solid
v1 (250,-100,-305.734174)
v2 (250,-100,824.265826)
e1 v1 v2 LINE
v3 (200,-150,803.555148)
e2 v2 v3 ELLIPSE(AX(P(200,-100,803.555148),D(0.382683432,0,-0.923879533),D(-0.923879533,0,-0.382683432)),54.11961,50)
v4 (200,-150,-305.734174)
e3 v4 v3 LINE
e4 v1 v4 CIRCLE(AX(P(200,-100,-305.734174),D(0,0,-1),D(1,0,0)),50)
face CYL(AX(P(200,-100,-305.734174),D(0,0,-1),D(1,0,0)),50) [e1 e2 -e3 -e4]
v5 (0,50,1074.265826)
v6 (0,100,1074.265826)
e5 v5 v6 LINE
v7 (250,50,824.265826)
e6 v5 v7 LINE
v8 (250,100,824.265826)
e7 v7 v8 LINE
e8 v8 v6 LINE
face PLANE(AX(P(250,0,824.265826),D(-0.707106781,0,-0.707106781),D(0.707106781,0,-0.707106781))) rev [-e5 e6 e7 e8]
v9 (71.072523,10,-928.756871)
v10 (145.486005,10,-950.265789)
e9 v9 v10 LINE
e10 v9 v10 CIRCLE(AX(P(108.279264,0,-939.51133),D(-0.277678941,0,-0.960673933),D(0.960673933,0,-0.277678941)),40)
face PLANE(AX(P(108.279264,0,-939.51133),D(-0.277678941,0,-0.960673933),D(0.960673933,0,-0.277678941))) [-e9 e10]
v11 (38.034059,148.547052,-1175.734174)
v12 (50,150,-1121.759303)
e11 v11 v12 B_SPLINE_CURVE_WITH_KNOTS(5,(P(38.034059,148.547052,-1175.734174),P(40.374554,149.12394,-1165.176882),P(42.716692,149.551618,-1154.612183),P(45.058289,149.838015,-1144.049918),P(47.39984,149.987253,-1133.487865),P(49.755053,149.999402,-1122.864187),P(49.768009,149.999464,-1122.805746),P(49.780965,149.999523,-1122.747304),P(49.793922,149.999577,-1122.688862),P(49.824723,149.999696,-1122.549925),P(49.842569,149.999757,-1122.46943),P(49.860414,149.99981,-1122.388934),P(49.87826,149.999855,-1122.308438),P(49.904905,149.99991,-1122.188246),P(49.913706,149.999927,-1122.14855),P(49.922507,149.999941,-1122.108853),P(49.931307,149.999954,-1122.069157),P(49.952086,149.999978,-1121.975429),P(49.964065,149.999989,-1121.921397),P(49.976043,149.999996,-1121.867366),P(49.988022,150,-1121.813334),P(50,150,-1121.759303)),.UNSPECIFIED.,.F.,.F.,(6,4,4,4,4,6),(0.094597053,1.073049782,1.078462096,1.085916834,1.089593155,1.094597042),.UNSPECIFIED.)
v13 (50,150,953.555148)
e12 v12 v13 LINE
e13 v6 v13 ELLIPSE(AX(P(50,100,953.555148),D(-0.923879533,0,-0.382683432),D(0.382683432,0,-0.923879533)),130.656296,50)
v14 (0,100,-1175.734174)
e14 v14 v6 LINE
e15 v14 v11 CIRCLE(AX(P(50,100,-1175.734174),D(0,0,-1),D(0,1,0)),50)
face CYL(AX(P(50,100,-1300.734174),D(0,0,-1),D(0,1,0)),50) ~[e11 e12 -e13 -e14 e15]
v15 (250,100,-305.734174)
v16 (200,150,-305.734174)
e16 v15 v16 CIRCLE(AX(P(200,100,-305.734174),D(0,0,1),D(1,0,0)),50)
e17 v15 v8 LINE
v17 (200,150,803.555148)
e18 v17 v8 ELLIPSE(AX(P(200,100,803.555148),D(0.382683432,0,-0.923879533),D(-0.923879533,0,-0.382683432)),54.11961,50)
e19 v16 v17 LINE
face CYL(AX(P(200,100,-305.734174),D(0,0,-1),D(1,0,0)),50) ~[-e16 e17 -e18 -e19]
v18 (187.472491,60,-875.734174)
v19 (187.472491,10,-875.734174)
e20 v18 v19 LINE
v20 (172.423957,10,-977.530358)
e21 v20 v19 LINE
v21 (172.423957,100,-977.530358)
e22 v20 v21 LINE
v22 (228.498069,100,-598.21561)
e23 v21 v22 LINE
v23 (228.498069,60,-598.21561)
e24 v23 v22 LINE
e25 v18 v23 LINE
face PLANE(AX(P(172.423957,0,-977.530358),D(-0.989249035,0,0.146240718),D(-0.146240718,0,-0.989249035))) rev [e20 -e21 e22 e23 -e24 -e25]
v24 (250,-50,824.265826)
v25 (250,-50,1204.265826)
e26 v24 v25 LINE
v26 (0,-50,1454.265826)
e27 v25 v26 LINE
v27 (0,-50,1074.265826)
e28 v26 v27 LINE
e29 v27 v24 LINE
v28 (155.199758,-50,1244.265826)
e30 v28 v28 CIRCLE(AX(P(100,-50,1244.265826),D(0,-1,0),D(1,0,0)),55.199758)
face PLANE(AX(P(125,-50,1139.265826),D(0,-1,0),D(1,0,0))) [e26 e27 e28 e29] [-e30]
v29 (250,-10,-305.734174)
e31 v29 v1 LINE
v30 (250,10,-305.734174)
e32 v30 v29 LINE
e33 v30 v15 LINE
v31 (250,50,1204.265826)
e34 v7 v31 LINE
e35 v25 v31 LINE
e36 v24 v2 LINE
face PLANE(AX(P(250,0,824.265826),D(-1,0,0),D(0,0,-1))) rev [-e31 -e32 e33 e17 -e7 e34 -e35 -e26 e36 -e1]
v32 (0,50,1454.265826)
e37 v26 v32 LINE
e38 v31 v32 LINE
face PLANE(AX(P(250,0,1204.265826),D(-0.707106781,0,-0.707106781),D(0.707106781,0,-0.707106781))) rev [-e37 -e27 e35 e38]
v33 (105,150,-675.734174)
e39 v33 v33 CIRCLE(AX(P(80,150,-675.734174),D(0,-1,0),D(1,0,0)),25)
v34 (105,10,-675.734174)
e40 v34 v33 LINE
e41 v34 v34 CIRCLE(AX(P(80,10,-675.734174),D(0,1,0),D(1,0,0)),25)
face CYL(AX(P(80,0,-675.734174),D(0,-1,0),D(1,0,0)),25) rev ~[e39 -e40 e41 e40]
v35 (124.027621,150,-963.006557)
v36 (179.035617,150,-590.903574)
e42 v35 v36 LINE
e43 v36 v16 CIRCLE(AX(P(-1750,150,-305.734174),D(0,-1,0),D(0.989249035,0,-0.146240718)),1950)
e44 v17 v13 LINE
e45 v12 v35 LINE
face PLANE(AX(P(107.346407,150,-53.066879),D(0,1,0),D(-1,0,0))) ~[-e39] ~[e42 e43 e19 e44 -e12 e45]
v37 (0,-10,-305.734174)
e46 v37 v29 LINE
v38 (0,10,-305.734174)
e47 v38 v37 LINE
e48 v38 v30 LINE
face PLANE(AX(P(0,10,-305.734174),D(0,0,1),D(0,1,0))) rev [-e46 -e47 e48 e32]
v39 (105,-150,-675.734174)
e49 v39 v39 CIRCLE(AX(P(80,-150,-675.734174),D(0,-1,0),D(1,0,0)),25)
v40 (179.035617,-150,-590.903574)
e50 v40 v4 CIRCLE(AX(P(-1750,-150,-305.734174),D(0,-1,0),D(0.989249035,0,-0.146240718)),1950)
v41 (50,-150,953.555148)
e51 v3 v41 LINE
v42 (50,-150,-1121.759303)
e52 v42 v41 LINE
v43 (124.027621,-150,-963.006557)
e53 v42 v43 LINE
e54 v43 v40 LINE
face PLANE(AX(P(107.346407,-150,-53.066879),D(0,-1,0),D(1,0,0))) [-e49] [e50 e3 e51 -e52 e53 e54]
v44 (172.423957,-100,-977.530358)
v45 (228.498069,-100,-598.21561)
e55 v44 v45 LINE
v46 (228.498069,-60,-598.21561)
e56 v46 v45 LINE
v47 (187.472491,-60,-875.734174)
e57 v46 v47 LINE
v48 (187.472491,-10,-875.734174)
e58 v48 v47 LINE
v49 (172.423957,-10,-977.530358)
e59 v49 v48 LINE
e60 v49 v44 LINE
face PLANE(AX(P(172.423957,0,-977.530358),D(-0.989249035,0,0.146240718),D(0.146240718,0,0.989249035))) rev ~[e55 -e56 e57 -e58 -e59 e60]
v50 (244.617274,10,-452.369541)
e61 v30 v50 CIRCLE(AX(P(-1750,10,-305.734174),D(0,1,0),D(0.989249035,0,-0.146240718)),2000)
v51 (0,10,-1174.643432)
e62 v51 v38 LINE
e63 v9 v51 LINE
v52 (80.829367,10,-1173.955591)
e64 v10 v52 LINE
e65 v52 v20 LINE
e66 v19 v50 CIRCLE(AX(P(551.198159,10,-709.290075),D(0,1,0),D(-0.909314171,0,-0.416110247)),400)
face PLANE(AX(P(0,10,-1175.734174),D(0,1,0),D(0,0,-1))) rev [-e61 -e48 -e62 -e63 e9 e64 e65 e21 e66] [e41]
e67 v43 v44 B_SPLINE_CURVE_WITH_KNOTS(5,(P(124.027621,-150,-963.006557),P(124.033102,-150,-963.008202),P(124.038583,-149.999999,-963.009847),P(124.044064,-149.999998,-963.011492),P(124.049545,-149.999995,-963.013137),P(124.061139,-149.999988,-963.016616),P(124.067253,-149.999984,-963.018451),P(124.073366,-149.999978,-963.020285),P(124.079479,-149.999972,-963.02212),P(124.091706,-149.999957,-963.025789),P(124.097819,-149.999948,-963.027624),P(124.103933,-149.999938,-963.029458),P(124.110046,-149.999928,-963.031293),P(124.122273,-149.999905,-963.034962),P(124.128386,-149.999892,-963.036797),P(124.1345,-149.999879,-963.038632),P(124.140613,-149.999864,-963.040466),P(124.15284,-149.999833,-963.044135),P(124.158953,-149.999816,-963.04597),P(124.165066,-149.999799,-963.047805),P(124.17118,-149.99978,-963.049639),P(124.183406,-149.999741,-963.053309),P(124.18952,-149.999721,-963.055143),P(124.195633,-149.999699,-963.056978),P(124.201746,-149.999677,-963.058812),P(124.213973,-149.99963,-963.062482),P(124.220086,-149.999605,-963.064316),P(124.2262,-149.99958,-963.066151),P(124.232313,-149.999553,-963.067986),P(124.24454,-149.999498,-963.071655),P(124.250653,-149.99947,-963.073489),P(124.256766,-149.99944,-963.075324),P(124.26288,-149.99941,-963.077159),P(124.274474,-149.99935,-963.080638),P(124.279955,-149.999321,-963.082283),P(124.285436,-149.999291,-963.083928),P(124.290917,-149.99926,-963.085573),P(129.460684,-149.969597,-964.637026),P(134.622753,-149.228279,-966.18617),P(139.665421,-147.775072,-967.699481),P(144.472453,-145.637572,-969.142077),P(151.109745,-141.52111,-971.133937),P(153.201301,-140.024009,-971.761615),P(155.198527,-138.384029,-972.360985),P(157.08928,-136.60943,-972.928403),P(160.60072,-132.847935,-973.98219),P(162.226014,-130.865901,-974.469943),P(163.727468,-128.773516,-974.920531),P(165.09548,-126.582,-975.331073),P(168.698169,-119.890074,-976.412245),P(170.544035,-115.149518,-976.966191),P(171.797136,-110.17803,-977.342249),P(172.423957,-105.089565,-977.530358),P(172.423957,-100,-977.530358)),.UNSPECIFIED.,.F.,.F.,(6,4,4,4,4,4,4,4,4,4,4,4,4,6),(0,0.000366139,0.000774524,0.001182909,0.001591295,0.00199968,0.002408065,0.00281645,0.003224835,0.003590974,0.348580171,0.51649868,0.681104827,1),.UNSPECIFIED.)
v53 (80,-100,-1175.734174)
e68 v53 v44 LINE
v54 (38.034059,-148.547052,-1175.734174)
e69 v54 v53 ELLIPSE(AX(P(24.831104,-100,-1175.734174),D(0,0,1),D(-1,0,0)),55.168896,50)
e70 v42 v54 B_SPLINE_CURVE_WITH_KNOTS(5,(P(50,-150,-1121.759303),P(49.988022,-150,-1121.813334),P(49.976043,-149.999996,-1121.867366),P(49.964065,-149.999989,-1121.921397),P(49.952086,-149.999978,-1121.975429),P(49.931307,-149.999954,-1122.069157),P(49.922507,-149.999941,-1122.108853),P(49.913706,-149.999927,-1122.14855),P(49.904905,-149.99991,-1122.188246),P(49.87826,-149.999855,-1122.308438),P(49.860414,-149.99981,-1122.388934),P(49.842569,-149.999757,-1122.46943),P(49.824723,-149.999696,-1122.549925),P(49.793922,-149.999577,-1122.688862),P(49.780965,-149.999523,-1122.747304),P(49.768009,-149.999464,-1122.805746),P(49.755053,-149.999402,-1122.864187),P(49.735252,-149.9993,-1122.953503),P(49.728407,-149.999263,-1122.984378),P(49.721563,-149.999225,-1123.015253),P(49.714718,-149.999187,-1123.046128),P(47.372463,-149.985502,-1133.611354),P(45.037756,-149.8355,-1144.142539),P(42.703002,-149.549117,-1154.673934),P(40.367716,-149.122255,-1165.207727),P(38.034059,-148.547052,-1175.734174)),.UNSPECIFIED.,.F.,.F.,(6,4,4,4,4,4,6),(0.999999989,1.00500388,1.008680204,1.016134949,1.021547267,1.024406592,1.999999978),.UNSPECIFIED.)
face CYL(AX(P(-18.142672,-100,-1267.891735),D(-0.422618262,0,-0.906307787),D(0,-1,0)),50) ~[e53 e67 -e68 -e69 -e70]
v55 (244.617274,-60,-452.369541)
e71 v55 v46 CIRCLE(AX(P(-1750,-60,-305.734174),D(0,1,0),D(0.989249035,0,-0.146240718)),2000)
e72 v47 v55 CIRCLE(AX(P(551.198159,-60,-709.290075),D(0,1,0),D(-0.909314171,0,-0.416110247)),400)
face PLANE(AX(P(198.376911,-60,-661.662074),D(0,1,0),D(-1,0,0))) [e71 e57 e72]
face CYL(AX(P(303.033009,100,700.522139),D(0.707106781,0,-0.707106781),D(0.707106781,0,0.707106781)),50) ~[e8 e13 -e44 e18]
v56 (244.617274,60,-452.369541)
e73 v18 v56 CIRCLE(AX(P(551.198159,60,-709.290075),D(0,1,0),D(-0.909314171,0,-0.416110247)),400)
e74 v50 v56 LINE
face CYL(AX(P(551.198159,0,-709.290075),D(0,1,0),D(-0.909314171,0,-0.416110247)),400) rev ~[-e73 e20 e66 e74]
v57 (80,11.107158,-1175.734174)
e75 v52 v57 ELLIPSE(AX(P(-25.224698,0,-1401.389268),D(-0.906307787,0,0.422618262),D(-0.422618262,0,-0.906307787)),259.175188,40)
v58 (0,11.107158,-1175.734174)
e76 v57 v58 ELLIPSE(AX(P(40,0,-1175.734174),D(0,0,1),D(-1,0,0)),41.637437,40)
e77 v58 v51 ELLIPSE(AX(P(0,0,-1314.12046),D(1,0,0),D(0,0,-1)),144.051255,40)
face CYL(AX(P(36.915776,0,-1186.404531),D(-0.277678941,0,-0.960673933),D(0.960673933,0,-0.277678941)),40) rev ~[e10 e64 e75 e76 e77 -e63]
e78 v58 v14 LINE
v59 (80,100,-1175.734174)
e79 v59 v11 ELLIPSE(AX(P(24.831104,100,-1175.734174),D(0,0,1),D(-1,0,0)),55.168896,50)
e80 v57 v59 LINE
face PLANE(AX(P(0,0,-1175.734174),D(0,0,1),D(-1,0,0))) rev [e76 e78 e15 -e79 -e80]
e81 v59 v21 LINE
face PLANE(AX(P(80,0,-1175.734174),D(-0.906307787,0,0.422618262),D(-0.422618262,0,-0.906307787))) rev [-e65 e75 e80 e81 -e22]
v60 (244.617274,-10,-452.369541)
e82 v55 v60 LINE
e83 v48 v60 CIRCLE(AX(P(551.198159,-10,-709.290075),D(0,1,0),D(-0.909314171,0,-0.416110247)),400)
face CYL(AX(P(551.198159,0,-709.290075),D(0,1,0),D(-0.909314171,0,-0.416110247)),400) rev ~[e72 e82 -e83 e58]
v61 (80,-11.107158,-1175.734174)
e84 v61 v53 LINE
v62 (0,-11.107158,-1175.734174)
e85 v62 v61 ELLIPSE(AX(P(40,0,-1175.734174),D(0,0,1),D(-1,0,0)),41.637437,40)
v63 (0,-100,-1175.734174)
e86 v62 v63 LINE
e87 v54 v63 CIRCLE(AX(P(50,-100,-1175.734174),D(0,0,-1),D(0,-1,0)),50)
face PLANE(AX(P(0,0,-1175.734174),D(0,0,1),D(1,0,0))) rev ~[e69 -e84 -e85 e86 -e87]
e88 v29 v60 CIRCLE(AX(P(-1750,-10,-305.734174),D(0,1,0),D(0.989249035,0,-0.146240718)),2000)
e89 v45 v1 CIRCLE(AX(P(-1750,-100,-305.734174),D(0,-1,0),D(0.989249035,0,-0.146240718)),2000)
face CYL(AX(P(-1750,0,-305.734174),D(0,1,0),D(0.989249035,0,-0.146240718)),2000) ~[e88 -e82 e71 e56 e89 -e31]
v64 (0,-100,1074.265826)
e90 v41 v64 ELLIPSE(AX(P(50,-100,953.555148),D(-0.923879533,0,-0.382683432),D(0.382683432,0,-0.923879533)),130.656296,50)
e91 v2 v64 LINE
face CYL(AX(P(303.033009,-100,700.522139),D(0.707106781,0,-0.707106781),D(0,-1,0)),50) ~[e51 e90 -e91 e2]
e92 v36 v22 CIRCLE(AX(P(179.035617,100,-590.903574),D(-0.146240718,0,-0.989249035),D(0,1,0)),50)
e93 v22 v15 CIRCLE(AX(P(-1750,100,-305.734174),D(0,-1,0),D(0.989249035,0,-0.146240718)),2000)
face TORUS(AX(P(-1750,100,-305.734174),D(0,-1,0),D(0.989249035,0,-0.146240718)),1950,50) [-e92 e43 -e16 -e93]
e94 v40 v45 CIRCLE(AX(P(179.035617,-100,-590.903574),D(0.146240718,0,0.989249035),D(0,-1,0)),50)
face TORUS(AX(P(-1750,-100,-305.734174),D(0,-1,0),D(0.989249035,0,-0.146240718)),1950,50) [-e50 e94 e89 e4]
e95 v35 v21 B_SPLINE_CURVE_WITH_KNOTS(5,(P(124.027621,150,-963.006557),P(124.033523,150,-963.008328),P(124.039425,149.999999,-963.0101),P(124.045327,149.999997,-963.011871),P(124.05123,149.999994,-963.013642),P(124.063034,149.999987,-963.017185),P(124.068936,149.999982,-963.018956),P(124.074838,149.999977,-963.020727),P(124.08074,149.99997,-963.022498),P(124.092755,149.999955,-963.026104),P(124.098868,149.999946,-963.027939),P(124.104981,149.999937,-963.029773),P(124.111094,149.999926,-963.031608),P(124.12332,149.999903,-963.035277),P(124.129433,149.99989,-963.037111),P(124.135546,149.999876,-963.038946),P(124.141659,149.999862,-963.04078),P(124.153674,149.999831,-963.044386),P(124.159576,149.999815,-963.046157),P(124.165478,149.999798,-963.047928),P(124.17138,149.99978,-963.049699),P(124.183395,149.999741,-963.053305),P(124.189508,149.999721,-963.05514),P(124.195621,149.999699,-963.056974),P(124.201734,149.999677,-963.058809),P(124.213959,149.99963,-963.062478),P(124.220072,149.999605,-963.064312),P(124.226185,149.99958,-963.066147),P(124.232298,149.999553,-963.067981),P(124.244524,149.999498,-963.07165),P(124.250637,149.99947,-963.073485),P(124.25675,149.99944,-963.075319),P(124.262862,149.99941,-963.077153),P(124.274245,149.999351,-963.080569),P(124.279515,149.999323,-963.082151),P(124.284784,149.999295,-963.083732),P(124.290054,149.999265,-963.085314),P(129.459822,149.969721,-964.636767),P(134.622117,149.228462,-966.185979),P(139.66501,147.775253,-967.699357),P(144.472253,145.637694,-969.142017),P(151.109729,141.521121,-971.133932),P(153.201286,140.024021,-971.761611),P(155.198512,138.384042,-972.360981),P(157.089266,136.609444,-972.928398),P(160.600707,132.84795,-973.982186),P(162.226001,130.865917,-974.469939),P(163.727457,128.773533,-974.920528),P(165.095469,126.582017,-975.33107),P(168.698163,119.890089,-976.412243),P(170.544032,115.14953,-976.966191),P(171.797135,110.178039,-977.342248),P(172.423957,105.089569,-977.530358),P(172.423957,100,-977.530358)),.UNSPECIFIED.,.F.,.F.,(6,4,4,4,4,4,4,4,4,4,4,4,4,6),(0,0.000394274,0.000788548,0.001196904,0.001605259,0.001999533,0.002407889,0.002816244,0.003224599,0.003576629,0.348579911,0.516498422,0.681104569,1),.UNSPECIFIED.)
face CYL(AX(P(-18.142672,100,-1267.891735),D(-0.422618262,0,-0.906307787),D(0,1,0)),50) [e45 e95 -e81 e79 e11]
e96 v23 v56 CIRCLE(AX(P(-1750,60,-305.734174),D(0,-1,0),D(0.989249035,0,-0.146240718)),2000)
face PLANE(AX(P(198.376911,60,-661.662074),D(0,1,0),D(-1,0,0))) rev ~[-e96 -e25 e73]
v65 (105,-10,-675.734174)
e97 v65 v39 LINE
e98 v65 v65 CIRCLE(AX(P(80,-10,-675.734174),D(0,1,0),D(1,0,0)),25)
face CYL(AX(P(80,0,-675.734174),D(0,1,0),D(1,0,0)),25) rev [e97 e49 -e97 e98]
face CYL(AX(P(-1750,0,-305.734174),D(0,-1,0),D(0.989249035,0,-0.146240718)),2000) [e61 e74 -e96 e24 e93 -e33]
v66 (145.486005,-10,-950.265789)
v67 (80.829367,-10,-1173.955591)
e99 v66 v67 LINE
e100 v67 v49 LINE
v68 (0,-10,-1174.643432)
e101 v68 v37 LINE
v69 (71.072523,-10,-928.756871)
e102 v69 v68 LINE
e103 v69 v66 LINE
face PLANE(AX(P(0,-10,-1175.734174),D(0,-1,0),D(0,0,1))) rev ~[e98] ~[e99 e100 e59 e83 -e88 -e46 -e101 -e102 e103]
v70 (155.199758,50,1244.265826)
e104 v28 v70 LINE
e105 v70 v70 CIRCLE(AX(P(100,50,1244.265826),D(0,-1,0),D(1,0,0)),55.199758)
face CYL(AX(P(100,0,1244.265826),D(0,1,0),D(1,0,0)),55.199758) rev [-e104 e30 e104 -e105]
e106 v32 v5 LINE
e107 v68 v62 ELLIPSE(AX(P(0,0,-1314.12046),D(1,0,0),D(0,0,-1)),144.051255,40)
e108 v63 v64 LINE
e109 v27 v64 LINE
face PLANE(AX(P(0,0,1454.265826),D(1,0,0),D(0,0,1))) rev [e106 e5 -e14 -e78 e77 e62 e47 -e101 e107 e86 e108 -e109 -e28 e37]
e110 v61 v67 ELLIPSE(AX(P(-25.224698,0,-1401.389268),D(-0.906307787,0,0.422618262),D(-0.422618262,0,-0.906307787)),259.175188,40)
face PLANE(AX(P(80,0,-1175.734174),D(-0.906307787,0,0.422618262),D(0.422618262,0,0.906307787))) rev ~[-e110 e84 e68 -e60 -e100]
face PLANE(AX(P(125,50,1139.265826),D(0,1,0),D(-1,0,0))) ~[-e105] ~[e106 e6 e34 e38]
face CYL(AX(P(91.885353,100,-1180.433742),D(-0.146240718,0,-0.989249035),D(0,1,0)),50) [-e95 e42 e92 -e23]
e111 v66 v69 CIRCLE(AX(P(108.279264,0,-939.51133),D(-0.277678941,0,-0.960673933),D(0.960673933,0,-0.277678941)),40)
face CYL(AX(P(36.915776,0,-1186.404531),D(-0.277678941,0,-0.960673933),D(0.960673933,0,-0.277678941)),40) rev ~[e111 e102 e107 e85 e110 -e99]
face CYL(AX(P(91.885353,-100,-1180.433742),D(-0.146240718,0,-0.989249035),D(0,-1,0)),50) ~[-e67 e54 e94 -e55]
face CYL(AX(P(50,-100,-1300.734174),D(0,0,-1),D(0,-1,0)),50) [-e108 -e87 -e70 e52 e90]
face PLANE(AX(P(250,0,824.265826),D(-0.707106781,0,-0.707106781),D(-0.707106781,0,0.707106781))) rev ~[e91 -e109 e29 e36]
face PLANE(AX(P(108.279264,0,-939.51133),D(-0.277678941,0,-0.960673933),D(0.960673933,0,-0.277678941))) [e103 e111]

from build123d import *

# Parameters (mm, degrees)
F0_R          = 25
F1_DEPTH      = 150
F0_R_2        = 55.1997583715
F2_DEPTH      = 50
F4_DEPTH      = 250.001
F8_DEPTH      = 60
F10_R         = 40
F11_DEPTH     = 257
F12_T1_DEPTH  = 1255
F12_T3_DEPTH  = 2500
F12_T5_DEPTH  = 603.5533905933
F12_T7_DEPTH  = 556.1937137964
F12_T9_DEPTH  = 595.9370668734
F12_T14_DEPTH = 330
F12_S15_R     = 50
F12_T16_DEPTH = 170
F12_T20_DEPTH = 330
F12_S21_R     = 50
F12_T22_DEPTH = 170
F12_T26_DEPTH = 330
F12_S27_R     = 50
F12_T28_DEPTH = 170
F12_T32_DEPTH = 330
F12_S33_R     = 50
F12_T34_DEPTH = 170
F12_T36_ANGLE = 8.4091330213
F12_T38_ANGLE = 8.4091330213


# Not quite as in the source:
# - a fillet or chamfer that OpenCascade refuses, or shapes differently, is made with other operations: its cross-section is extruded or revolved along the edge and cut away or added


with BuildPart() as f1:
    # F0 (on Front) → F1 (new body)
    with BuildSketch(Plane.XZ):
        with BuildLine():
            Line((250, 824.2658257814), (0, 1074.2658257814))
            Line((0, 1074.2658257814), (0, -1175.7341742186))
            Line((0, -1175.7341742186), (80, -1175.7341742186))
            Line((80, -1175.7341742186), (172.4239571783, -977.530358429))
            Line((172.4239571783, -977.530358429), (228.4980691431, -598.2156102055))
            ThreePointArc((228.4980691431, -598.2156102055), (244.6172738506, -452.3695412242), (250, -305.7341742186))
            Line((250, -305.7341742186), (250, 824.2658257814))
        make_face()
        with Locations((80, -675.7341742186)):
            Circle(F0_R, mode=Mode.SUBTRACT)
    extrude(amount=F1_DEPTH)

    # F0 (on Front) → F2 (join)
    with BuildSketch(Plane.XZ):
        Polygon((0, 1454.2658257814), (0, 1074.2658257814), (250, 824.2658257814), (250, 1204.2658257814), align=None)
        with Locations((100, 1244.2658257814)):
            Circle(F0_R_2, mode=Mode.SUBTRACT)
    extrude(amount=F2_DEPTH)

    # F3 (on face) → F4 (cut, through all)
    with BuildSketch(Plane(origin=(0, 0, 0), x_dir=(0, -1, 0), z_dir=(-1, 0, 0))):
        Polygon((10, -1175.7341742186), (10, -305.7341742186), (0, -305.7341742186), (0, -598.2156102055), (0, -977.530358429), (0, -1175.7341742186), align=None)
    extrude(amount=-F4_DEPTH, mode=Mode.SUBTRACT)

    # F5: F1 across plane


with BuildPart() as f1_1:
    add(f1.part)
    add(f1.part.mirror(Plane.XZ))

    # F7 (on offset) → F8 (cut, symmetric)
    with BuildSketch(Plane(origin=(0, 0, 0), x_dir=(-1, 0, 0), z_dir=(0, 1, 0))):
        with BuildLine():
            Line((-228.4980691431, -598.2156102055), (-187.4724905077, -875.7341742186))
            ThreePointArc((-187.4724905077, -875.7341742186), (-154.7929091893, -655.7842074431), (-244.6172738506, -452.3695412242))
            Line((-244.6172738506, -452.3695412242), (-228.4980691431, -598.2156102055))
        make_face()
        Polygon((-289.7645564147, -893.9040561501), (-187.4724905077, -875.7341742186), (-228.4980691431, -598.2156102055), (-244.6172738506, -452.3695412242), (-337.4301303856, -462.6274072361), align=None)
    extrude(amount=F8_DEPTH, both=True, mode=Mode.SUBTRACT)

    # F10 (on face) → F11 (cut)
    with BuildSketch(Plane(origin=(-313.6375788675, 0, -1085.0784920755), x_dir=(0.9606739331, 0, -0.2776789409), z_dir=(-0.2776789409, 0, -0.9606739331))):
        with Locations((364.9035775946, 0)):
            Circle(F10_R)
    extrude(amount=-F11_DEPTH, mode=Mode.SUBTRACT)

    # F12: fillet of radius 50 on 14 edges, made by hand

    # F12_s2 → F12_t1 (cut)
    with BuildSketch(Plane.XY.offset(-305.7341742186)):
        with BuildLine():
            ThreePointArc((250, -100), (235.3553390593, -135.3553390593), (200, -150))
            Line((200, -150), (250, -150))
            Line((250, -150), (250, -100))
        make_face()
        with BuildLine():
            ThreePointArc((250, 100), (235.3553390593, 135.3553390593), (200, 150))
            Line((200, 150), (250, 150))
            Line((250, 150), (250, 100))
        make_face()
    extrude(amount=F12_T1_DEPTH, mode=Mode.SUBTRACT)

    # F12_s4 → F12_t3 (cut)
    with BuildSketch(Plane.XY.offset(-1300.7341742186)):
        with BuildLine():
            ThreePointArc((50, -150), (14.6446609407, -135.3553390593), (0, -100))
            Line((0, -100), (0, -150))
            Line((0, -150), (50, -150))
        make_face()
        with BuildLine():
            ThreePointArc((50, 150), (14.6446609407, 135.3553390593), (0, 100))
            Line((0, 100), (0, 150))
            Line((0, 150), (50, 150))
        make_face()
    extrude(amount=F12_T3_DEPTH, mode=Mode.SUBTRACT)

    # F12_s6 → F12_t5 (cut)
    with BuildSketch(Plane(origin=(-198.7445652424, 0, 198.7445652424), x_dir=(0, 1, 0), z_dir=(-0.7071067812, 0, 0.7071067812))):
        with BuildLine():
            ThreePointArc((-150, -709.620650207), (-135.3553390593, -744.9759892663), (-100, -759.620650207))
            Line((-100, -759.620650207), (-150, -759.620650207))
            Line((-150, -759.620650207), (-150, -709.620650207))
        make_face()
        with BuildLine():
            ThreePointArc((100, -759.620650207), (135.3553390593, -744.9759892663), (150, -709.620650207))
            Line((150, -709.620650207), (150, -759.620650207))
            Line((150, -759.620650207), (100, -759.620650207))
        make_face()
    extrude(amount=F12_T5_DEPTH, mode=Mode.SUBTRACT)

    # F12_s8 → F12_t7 (cut)
    with BuildSketch(Plane(origin=(-488.8711024777, 0, -1048.3874625005), x_dir=(0, 1, 0), z_dir=(0.4226182617, 0, 0.906307787))):
        with BuildLine():
            ThreePointArc((-150, -519.3913559403), (-135.3553390593, -554.7466949997), (-100, -569.3913559403))
            Line((-100, -569.3913559403), (-150, -569.3913559403))
            Line((-150, -569.3913559403), (-150, -519.3913559403))
        make_face()
        with BuildLine():
            ThreePointArc((150, -519.3913559403), (135.3553390593, -554.7466949997), (100, -569.3913559403))
            Line((100, -569.3913559403), (150, -569.3913559403))
            Line((150, -569.3913559403), (150, -519.3913559403))
        make_face()
    extrude(amount=F12_T7_DEPTH, mode=Mode.SUBTRACT)

    # F12_s10 → F12_t9 (cut)
    with BuildSketch(Plane(origin=(-168.8064738845, 0, -1141.8956608733), x_dir=(0, 1, 0), z_dir=(0.146240718, 0, 0.9892490346))):
        with BuildLine():
            ThreePointArc((-150, -263.5249746526), (-135.3553390593, -298.8803137119), (-100, -313.5249746526))
            Line((-100, -313.5249746526), (-150, -313.5249746526))
            Line((-150, -313.5249746526), (-150, -263.5249746526))
        make_face()
        with BuildLine():
            ThreePointArc((150, -263.5249746526), (135.3553390593, -298.8803137119), (100, -313.5249746526))
            Line((100, -313.5249746526), (150, -313.5249746526))
            Line((150, -313.5249746526), (150, -263.5249746526))
        make_face()
    extrude(amount=F12_T9_DEPTH, mode=Mode.SUBTRACT)


with BuildPart() as f12_tool12:
    # F12_s13 → F12_t14 (new body)
    with BuildSketch(Plane.YZ.offset(-125)):
        with BuildLine():
            ThreePointArc((-150, -1125.7341742186), (-135.3553390593, -1161.0895132779), (-100, -1175.7341742186))
            Line((-100, -1175.7341742186), (-150, -1175.7341742186))
            Line((-150, -1175.7341742186), (-150, -1125.7341742186))
        make_face()
    extrude(amount=F12_T14_DEPTH)

    # F12_s15 → F12_t16 (cut, symmetric)
    with BuildSketch(Plane(origin=(-433.606336546, 0, -929.8717894996), x_dir=(0, 1, 0), z_dir=(-0.4226182617, 0, -0.906307787))):
        with Locations((-100, 519.3913559403)):
            Circle(F12_S15_R)
    extrude(amount=F12_T16_DEPTH, both=True, mode=Mode.SUBTRACT)


with BuildPart() as f1_2:
    add(f1_1.part)

    # F12_t11: cut F12_tool12
    add(f12_tool12.part, mode=Mode.SUBTRACT)


with BuildPart() as f12_tool18:
    # F12_s19 → F12_t20 (new body)
    with BuildSketch(Plane.YZ.offset(-125)):
        with BuildLine():
            ThreePointArc((-150, -1125.7341742186), (-135.3553390593, -1161.0895132779), (-100, -1175.7341742186))
            Line((-100, -1175.7341742186), (-150, -1175.7341742186))
            Line((-150, -1175.7341742186), (-150, -1125.7341742186))
        make_face()
    extrude(amount=F12_T20_DEPTH)

    # F12_s21 → F12_t22 (cut, symmetric)
    with BuildSketch(Plane.XY.offset(-1150.7)):
        with Locations((50, -100)):
            Circle(F12_S21_R)
    extrude(amount=F12_T22_DEPTH, both=True, mode=Mode.SUBTRACT)


with BuildPart() as f1_3:
    add(f1_2.part)

    # F12_t17: cut F12_tool18
    add(f12_tool18.part, mode=Mode.SUBTRACT)


with BuildPart() as f12_tool24:
    # F12_s25 → F12_t26 (new body)
    with BuildSketch(Plane.YZ.offset(-125)):
        with BuildLine():
            ThreePointArc((150, -1125.7341742186), (135.3553390593, -1161.0895132779), (100, -1175.7341742186))
            Line((100, -1175.7341742186), (150, -1175.7341742186))
            Line((150, -1175.7341742186), (150, -1125.7341742186))
        make_face()
    extrude(amount=F12_T26_DEPTH)

    # F12_s27 → F12_t28 (cut, symmetric)
    with BuildSketch(Plane(origin=(-433.606336546, 0, -929.8717894996), x_dir=(0, 1, 0), z_dir=(-0.4226182617, 0, -0.906307787))):
        with Locations((100, 519.3913559403)):
            Circle(F12_S27_R)
    extrude(amount=F12_T28_DEPTH, both=True, mode=Mode.SUBTRACT)


with BuildPart() as f1_4:
    add(f1_3.part)

    # F12_t23: cut F12_tool24
    add(f12_tool24.part, mode=Mode.SUBTRACT)


with BuildPart() as f12_tool30:
    # F12_s31 → F12_t32 (new body)
    with BuildSketch(Plane.YZ.offset(-125)):
        with BuildLine():
            ThreePointArc((150, -1125.7341742186), (135.3553390593, -1161.0895132779), (100, -1175.7341742186))
            Line((100, -1175.7341742186), (150, -1175.7341742186))
            Line((150, -1175.7341742186), (150, -1125.7341742186))
        make_face()
    extrude(amount=F12_T32_DEPTH)

    # F12_s33 → F12_t34 (cut, symmetric)
    with BuildSketch(Plane.XY.offset(-1150.7)):
        with Locations((50, 100)):
            Circle(F12_S33_R)
    extrude(amount=F12_T34_DEPTH, both=True, mode=Mode.SUBTRACT)


with BuildPart() as f1_5:
    add(f1_4.part)

    # F12_t29: cut F12_tool30
    add(f12_tool30.part, mode=Mode.SUBTRACT)

    # F12_s35 → F12_t36 (revolve, cut)
    with BuildSketch(Plane(origin=(-81.6562093461, 0, -552.3654928034), x_dir=(0, 1, 0), z_dir=(-0.146240718, 0, -0.9892490346))):
        with BuildLine():
            ThreePointArc((-100, 313.5249746526), (-135.3553390593, 298.8803137119), (-150, 263.5249746526))
            Line((-150, 263.5249746526), (-150, 313.5249746526))
            Line((-150, 313.5249746526), (-100, 313.5249746526))
        make_face()
    revolve(axis=Axis((-1749.9999999999, -150, -305.7341742186), (0, -1, 0)), revolution_arc=F12_T36_ANGLE, mode=Mode.SUBTRACT)

    # F12_s37 → F12_t38 (revolve, cut)
    with BuildSketch(Plane(origin=(-81.6562093461, 0, -552.3654928034), x_dir=(0, 1, 0), z_dir=(-0.146240718, 0, -0.9892490346))):
        with BuildLine():
            ThreePointArc((150, 263.5249746526), (135.3553390593, 298.8803137119), (100, 313.5249746526))
            Line((100, 313.5249746526), (150, 313.5249746526))
            Line((150, 313.5249746526), (150, 263.5249746526))
        make_face()
    revolve(axis=Axis((-1749.9999999999, 150, -305.7341742186), (0, -1, 0)), revolution_arc=F12_T38_ANGLE, mode=Mode.SUBTRACT)


solid = f1_5.part
